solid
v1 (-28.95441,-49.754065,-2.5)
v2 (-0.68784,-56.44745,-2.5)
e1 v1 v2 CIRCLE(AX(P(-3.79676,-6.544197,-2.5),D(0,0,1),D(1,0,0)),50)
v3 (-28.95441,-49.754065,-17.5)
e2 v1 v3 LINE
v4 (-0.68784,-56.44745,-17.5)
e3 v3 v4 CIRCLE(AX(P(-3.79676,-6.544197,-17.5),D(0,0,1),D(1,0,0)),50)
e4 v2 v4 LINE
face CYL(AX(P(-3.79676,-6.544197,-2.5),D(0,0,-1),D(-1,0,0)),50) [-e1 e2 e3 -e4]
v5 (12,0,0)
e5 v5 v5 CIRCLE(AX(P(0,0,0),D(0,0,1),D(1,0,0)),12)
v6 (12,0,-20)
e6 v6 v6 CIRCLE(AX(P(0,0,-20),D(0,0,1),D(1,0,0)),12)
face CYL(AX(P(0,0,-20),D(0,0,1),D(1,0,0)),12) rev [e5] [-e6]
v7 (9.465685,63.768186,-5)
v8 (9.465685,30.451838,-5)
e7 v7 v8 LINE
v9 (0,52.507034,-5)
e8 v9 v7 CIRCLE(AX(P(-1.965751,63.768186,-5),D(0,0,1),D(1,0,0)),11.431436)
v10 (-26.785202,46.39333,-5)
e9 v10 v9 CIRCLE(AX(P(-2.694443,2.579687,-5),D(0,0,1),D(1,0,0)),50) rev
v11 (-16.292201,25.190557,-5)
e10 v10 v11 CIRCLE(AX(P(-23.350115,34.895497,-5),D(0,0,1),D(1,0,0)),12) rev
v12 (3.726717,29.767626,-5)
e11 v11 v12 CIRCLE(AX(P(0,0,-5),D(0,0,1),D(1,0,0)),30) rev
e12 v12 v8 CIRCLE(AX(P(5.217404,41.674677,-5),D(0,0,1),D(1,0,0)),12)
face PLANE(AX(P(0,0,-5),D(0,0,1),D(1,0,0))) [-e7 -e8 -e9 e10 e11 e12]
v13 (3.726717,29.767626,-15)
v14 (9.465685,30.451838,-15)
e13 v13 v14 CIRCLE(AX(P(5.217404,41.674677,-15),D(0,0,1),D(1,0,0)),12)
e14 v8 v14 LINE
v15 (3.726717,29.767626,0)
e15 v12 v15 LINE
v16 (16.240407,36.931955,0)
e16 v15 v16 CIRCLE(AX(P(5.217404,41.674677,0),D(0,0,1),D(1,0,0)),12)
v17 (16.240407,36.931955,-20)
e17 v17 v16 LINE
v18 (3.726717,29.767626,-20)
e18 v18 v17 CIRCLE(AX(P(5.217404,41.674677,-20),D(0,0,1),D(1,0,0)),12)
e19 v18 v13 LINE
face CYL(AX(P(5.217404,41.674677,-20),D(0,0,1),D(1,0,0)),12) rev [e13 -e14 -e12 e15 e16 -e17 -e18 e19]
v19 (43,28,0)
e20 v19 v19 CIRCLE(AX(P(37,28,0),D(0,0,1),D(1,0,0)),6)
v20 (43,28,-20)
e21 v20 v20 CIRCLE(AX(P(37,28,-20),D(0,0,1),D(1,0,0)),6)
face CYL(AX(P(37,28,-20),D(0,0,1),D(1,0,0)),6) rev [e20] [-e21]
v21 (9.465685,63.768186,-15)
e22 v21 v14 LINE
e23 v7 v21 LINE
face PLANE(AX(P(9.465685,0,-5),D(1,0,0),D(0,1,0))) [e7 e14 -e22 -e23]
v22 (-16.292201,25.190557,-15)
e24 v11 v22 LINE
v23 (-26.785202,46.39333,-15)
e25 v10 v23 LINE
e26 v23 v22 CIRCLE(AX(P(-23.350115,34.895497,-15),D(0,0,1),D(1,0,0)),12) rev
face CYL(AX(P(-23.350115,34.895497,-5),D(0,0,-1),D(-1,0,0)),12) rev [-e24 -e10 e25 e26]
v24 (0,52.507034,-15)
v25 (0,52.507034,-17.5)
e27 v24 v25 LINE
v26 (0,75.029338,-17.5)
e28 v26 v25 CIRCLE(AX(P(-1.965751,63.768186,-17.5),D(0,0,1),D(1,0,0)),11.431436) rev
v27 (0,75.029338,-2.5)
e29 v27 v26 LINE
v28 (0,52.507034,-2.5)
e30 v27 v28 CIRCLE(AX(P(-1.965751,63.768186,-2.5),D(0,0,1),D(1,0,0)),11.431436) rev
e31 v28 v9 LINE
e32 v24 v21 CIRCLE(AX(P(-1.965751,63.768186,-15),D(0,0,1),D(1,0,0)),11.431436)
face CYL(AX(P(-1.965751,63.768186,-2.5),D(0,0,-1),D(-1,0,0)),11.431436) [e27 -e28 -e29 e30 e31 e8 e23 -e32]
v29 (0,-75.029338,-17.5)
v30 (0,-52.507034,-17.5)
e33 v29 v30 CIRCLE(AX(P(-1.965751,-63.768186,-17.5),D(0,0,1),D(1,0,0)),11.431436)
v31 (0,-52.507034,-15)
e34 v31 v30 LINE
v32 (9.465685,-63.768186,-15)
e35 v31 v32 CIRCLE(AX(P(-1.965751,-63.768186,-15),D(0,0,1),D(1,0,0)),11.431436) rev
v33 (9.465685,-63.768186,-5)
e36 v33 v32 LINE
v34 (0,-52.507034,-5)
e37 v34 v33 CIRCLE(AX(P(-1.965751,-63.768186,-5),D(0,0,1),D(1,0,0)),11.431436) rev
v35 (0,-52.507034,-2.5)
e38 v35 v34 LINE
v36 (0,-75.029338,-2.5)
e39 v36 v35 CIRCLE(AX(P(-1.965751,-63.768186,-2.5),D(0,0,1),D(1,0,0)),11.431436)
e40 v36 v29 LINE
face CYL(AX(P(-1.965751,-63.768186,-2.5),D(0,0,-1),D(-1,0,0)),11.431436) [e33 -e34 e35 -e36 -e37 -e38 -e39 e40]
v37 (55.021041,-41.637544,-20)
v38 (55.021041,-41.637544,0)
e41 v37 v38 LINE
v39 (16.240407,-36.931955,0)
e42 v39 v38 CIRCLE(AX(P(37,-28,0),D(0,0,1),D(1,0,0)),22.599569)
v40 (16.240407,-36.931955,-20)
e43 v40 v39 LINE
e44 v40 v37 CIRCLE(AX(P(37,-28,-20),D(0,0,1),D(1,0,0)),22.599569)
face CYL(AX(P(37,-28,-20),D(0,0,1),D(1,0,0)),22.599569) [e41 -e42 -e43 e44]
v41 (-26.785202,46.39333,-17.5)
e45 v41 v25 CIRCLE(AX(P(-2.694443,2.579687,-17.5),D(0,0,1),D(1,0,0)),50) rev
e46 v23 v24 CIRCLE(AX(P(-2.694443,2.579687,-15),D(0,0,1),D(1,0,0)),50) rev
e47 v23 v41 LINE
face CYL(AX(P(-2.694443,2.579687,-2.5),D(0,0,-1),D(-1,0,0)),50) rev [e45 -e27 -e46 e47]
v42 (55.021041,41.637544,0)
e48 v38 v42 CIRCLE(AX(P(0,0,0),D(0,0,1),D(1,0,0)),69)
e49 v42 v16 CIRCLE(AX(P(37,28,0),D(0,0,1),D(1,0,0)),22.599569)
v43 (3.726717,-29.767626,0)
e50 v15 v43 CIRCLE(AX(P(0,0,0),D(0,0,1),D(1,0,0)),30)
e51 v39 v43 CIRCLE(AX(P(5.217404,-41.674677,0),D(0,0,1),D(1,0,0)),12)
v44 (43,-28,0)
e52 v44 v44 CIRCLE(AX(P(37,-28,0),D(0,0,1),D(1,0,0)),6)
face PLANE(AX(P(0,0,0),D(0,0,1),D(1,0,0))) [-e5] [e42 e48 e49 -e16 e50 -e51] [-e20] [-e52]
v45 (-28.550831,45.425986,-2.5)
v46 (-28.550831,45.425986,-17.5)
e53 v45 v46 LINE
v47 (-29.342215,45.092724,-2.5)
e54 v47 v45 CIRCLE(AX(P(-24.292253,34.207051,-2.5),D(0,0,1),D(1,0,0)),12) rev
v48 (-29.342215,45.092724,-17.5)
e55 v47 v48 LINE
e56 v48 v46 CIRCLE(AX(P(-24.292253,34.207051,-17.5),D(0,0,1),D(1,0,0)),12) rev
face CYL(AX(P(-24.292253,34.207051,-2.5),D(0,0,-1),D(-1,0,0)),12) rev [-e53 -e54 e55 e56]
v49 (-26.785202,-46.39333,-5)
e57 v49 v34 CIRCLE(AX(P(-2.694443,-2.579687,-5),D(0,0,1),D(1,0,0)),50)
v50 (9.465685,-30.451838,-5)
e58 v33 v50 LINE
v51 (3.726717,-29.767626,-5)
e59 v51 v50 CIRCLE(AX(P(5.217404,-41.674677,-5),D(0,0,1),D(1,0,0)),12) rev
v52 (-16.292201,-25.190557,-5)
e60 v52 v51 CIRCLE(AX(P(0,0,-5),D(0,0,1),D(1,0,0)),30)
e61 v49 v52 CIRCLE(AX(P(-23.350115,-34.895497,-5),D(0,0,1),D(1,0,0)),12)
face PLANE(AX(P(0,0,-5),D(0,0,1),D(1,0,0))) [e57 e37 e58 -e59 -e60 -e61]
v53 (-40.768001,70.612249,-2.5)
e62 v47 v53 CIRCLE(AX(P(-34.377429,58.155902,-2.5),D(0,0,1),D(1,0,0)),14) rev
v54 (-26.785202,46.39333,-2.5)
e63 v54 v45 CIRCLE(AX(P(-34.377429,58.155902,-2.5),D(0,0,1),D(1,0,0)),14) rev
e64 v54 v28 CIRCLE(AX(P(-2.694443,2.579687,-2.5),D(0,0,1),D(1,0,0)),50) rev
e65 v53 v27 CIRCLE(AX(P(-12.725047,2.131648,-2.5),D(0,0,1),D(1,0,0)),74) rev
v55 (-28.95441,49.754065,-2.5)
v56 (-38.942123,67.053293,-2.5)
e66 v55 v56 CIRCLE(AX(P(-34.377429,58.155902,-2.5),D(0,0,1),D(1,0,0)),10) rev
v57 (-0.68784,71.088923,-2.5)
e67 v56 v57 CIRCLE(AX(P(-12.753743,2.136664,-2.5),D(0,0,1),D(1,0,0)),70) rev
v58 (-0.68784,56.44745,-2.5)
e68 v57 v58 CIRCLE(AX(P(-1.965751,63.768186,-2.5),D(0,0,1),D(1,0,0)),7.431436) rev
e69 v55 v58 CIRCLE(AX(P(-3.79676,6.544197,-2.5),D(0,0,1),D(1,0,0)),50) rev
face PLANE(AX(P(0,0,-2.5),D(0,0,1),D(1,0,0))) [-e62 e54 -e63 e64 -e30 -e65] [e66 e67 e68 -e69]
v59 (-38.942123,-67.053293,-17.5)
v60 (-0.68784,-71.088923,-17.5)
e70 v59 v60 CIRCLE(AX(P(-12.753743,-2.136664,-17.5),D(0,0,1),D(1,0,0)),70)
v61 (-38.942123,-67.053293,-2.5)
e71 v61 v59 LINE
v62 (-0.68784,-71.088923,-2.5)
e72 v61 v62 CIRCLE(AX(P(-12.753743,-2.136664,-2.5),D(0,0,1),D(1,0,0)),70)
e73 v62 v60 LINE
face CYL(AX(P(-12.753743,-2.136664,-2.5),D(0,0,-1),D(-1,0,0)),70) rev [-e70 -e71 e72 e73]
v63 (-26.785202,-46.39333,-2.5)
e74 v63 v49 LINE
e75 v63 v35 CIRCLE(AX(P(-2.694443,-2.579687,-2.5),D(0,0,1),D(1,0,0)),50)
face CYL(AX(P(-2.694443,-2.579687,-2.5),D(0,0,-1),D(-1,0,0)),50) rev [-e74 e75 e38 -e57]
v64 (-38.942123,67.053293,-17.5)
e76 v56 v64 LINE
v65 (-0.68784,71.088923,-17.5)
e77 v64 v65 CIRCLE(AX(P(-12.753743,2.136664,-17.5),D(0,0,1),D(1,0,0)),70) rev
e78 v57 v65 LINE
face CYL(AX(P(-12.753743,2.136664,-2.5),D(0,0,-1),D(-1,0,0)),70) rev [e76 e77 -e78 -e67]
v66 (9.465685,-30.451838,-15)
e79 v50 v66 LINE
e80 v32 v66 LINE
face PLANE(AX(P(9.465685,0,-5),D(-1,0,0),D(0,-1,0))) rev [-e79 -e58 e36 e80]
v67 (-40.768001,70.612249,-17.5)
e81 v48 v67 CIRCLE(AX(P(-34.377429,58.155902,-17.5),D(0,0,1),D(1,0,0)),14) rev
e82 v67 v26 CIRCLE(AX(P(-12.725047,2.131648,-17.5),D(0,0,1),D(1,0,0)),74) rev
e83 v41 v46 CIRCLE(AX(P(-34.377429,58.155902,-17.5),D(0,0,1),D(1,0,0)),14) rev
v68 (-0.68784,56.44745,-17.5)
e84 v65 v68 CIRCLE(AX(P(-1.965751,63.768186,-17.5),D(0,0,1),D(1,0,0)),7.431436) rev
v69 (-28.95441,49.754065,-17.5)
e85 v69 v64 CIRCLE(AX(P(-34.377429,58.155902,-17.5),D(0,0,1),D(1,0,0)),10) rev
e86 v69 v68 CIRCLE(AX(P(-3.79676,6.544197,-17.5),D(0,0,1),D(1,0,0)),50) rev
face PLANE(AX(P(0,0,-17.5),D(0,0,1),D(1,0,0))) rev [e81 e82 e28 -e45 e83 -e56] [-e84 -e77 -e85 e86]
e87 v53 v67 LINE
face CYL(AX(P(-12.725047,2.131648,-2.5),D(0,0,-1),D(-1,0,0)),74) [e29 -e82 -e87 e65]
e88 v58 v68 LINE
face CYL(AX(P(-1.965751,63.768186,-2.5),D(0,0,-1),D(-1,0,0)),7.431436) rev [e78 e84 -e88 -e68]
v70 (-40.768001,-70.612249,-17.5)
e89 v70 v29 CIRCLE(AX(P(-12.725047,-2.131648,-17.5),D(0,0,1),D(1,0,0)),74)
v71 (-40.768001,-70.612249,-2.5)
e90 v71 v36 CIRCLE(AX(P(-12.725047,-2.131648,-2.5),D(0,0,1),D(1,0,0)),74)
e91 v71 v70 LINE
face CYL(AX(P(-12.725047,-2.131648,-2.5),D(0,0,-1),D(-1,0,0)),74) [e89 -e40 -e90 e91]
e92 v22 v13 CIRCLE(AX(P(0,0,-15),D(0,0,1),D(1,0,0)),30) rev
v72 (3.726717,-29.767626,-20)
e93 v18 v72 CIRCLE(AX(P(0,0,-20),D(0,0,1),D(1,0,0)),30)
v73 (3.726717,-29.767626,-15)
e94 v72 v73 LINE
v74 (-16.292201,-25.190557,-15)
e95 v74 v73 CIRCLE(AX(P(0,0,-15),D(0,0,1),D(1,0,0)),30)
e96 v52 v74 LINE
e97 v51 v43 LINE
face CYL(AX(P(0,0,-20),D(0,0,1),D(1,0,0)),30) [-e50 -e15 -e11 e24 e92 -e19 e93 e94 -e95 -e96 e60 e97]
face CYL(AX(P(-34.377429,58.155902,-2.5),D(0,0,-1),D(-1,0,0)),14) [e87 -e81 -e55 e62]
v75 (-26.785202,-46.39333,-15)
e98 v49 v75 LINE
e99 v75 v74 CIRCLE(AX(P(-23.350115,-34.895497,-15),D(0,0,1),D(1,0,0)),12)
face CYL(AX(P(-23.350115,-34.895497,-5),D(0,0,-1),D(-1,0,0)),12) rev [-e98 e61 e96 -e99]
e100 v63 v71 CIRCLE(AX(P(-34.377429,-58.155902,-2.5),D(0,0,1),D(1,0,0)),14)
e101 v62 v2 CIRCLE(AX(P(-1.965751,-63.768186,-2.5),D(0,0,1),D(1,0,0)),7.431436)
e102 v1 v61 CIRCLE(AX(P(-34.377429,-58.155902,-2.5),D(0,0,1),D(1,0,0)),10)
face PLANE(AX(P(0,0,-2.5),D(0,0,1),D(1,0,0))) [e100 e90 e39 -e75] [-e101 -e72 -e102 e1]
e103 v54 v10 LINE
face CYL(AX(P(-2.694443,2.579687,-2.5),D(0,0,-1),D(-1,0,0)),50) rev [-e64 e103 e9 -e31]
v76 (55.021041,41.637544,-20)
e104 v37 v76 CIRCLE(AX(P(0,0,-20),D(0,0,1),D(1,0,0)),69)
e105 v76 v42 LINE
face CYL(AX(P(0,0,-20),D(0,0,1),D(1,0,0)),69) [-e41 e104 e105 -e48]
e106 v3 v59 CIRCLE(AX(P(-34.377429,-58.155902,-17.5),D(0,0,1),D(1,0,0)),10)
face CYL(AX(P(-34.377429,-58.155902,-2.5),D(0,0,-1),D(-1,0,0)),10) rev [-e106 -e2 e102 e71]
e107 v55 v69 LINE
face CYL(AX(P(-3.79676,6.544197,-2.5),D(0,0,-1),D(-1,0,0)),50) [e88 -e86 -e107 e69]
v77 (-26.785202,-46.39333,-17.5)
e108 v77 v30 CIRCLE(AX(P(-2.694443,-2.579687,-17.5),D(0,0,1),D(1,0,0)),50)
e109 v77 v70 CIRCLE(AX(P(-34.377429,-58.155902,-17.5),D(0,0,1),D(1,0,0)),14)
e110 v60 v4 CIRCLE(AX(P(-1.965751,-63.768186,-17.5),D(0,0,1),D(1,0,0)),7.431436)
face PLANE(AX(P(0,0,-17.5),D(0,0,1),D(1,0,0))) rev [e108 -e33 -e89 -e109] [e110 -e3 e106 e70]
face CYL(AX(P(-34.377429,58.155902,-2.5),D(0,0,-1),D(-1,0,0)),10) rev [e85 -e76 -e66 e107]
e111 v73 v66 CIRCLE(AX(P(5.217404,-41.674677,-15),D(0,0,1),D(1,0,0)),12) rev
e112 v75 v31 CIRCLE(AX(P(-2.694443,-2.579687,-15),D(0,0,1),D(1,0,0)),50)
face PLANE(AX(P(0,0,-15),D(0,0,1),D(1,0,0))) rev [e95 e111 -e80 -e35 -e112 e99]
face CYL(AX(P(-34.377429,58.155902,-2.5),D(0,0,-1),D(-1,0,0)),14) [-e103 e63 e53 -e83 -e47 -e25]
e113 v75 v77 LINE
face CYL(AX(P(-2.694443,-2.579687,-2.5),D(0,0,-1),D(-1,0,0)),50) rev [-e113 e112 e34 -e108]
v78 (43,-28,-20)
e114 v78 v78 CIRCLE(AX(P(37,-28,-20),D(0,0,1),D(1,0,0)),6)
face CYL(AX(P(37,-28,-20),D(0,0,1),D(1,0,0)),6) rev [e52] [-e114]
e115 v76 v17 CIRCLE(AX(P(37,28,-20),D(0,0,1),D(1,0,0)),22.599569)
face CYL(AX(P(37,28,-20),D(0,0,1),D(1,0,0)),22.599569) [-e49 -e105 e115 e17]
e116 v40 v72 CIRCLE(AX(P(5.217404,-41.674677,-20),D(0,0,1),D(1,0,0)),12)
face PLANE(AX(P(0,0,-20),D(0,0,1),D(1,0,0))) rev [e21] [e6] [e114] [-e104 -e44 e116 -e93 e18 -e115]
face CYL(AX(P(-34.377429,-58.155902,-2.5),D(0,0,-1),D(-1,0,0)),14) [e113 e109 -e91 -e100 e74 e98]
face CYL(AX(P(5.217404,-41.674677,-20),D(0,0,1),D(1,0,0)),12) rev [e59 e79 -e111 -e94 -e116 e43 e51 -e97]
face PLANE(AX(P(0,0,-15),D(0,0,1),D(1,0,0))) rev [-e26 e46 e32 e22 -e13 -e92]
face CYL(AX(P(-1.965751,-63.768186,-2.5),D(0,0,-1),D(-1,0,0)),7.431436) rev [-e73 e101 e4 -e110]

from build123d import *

# Parameters (mm, degrees)
SKETCH1_R             = 12
SKETCH1_R_2           = 6
BOSS_EXTRUDE1_DEPTH   = 20
BOSS_EXTRUDE2_DEPTH   = 7.5
BOSS_EXTRUDE2_2_DEPTH = 7.5
BOSS_EXTRUDE3_DEPTH   = 5


with BuildPart() as part:
    # Sketch1 → Boss-Extrude1 (new body)
    with BuildSketch(Plane.XY):
        with BuildLine():
            ThreePointArc((3.726717402, 29.767626331), (-30, 0), (3.726717402, -29.767626331))
            ThreePointArc((3.726717402, -29.767626331), (11.179632465, -31.260655735), (16.240407222, -36.931955285))
            ThreePointArc((16.240407222, -36.931955285), (34.277765833, -50.435016351), (55.021040607, -41.637544243))
            ThreePointArc((55.021040607, -41.637544243), (69, 0), (55.021040607, 41.637544243))
            ThreePointArc((55.021040607, 41.637544243), (34.277765833, 50.435016351), (16.240407222, 36.931955285))
            ThreePointArc((16.240407222, 36.931955285), (11.179632465, 31.260655735), (3.726717402, 29.767626331))
        make_face()
        Circle(SKETCH1_R, mode=Mode.SUBTRACT)
        with Locations((37, -28)):
            Circle(SKETCH1_R_2, mode=Mode.SUBTRACT)
        with Locations((37, 28)):
            Circle(SKETCH1_R_2, mode=Mode.SUBTRACT)
    extrude(amount=-BOSS_EXTRUDE1_DEPTH)



with BuildPart() as body_2:
    # Sketch2 → Boss-Extrude2 (new, symmetric)
    with BuildSketch(Plane.XY.offset(-10)):
        with BuildLine():
            ThreePointArc((0, 75.029338215), (-20.696071905, 75.701090057), (-40.76800111, 70.612249245))
            ThreePointArc((-40.76800111, 70.612249245), (-47.155174797, 52.434957534), (-29.342215302, 45.092723837))
            ThreePointArc((-29.342215302, 45.092723837), (-28.949505146, 45.266435927), (-28.550831211, 45.42598608))
            ThreePointArc((-28.550831211, 45.42598608), (-27.650605488, 45.877879071), (-26.78520184, 46.393330477))
            ThreePointArc((-26.78520184, 46.393330477), (-13.82075983, 51.326021178), (0, 52.507034247))
            ThreePointArc((0, 52.507034247), (9.465684914, 63.768186231), (0, 75.029338215))
        make_face()
        with BuildLine():
            ThreePointArc((-0.687840355, 71.088922545), (5.465684914, 63.768186231), (-0.687840355, 56.447449916))
            ThreePointArc((-0.687840355, 56.447449916), (-15.317913255, 55.198724707), (-28.954409532, 49.754065216))
            ThreePointArc((-28.954409532, 49.754065216), (-43.037682802, 53.155902064), (-38.942123297, 67.053292907))
            ThreePointArc((-38.942123297, 67.053292907), (-20.097629603, 71.750364494), (-0.687840355, 71.088922545))
        make_face(mode=Mode.SUBTRACT)
    extrude(amount=BOSS_EXTRUDE2_DEPTH, both=True)


with BuildPart() as body_3:
    # Sketch2 → Boss-Extrude2 2 (new, symmetric)
    with BuildSketch(Plane.XY.offset(-10)):
        with BuildLine():
            ThreePointArc((-40.76800111, -70.612249245), (-20.696071905, -75.701090057), (0, -75.029338215))
            ThreePointArc((0, -75.029338215), (9.465684914, -63.768186231), (0, -52.507034247))
            ThreePointArc((0, -52.507034247), (-13.82075983, -51.326021178), (-26.78520184, -46.393330477))
            ThreePointArc((-26.78520184, -46.393330477), (-46.501784417, -51.155902064), (-40.76800111, -70.612249245))
        make_face()
        with BuildLine():
            ThreePointArc((-0.687840355, -71.088922545), (-20.097629603, -71.750364494), (-38.942123297, -67.053292907))
            ThreePointArc((-38.942123297, -67.053292907), (-43.037682802, -53.155902064), (-28.954409532, -49.754065216))
            ThreePointArc((-28.954409532, -49.754065216), (-15.317913255, -55.198724707), (-0.687840355, -56.447449916))
            ThreePointArc((-0.687840355, -56.447449916), (5.465684914, -63.768186231), (-0.687840355, -71.088922545))
        make_face(mode=Mode.SUBTRACT)
    extrude(amount=BOSS_EXTRUDE2_2_DEPTH, both=True)


with BuildPart() as part_1:
    add(part.part)

    add(body_2.part)  # Boss-Extrude3 merges body 2

    add(body_3.part)  # Boss-Extrude3 merges body 3
    # Sketch3 → Boss-Extrude3 (add, symmetric)
    with BuildSketch(Plane.XY.offset(-10)):
        with BuildLine():
            Line((9.465684914, 30.451837991), (9.465684914, 63.768186231))
            ThreePointArc((9.465684914, 63.768186231), (6.784937065, 56.41269959), (0, 52.507034247))
            ThreePointArc((0, 52.507034247), (-13.82075983, 51.326021178), (-26.78520184, 46.393330477))
            ThreePointArc((-26.78520184, 46.393330477), (-12.59508777, 40.218032027), (-16.29220141, 25.190557223))
            ThreePointArc((-16.29220141, 25.190557223), (-6.68657143, 29.245337449), (3.726717402, 29.767626331))
            ThreePointArc((3.726717402, 29.767626331), (6.638008812, 29.759061773), (9.465684914, 30.451837991))
        make_face()
        with BuildLine():
            ThreePointArc((0, -52.507034247), (6.784937065, -56.41269959), (9.465684914, -63.768186231))
            Line((9.465684914, -63.768186231), (9.465684914, -30.451837991))
            ThreePointArc((9.465684914, -30.451837991), (6.638008812, -29.759061773), (3.726717402, -29.767626331))
            ThreePointArc((3.726717402, -29.767626331), (-6.68657143, -29.245337449), (-16.29220141, -25.190557223))
            ThreePointArc((-16.29220141, -25.190557223), (-12.59508777, -40.218032027), (-26.78520184, -46.393330477))
            ThreePointArc((-26.78520184, -46.393330477), (-13.82075983, -51.326021178), (0, -52.507034247))
        make_face()
    extrude(amount=BOSS_EXTRUDE3_DEPTH, both=True)


solid = part_1.part
